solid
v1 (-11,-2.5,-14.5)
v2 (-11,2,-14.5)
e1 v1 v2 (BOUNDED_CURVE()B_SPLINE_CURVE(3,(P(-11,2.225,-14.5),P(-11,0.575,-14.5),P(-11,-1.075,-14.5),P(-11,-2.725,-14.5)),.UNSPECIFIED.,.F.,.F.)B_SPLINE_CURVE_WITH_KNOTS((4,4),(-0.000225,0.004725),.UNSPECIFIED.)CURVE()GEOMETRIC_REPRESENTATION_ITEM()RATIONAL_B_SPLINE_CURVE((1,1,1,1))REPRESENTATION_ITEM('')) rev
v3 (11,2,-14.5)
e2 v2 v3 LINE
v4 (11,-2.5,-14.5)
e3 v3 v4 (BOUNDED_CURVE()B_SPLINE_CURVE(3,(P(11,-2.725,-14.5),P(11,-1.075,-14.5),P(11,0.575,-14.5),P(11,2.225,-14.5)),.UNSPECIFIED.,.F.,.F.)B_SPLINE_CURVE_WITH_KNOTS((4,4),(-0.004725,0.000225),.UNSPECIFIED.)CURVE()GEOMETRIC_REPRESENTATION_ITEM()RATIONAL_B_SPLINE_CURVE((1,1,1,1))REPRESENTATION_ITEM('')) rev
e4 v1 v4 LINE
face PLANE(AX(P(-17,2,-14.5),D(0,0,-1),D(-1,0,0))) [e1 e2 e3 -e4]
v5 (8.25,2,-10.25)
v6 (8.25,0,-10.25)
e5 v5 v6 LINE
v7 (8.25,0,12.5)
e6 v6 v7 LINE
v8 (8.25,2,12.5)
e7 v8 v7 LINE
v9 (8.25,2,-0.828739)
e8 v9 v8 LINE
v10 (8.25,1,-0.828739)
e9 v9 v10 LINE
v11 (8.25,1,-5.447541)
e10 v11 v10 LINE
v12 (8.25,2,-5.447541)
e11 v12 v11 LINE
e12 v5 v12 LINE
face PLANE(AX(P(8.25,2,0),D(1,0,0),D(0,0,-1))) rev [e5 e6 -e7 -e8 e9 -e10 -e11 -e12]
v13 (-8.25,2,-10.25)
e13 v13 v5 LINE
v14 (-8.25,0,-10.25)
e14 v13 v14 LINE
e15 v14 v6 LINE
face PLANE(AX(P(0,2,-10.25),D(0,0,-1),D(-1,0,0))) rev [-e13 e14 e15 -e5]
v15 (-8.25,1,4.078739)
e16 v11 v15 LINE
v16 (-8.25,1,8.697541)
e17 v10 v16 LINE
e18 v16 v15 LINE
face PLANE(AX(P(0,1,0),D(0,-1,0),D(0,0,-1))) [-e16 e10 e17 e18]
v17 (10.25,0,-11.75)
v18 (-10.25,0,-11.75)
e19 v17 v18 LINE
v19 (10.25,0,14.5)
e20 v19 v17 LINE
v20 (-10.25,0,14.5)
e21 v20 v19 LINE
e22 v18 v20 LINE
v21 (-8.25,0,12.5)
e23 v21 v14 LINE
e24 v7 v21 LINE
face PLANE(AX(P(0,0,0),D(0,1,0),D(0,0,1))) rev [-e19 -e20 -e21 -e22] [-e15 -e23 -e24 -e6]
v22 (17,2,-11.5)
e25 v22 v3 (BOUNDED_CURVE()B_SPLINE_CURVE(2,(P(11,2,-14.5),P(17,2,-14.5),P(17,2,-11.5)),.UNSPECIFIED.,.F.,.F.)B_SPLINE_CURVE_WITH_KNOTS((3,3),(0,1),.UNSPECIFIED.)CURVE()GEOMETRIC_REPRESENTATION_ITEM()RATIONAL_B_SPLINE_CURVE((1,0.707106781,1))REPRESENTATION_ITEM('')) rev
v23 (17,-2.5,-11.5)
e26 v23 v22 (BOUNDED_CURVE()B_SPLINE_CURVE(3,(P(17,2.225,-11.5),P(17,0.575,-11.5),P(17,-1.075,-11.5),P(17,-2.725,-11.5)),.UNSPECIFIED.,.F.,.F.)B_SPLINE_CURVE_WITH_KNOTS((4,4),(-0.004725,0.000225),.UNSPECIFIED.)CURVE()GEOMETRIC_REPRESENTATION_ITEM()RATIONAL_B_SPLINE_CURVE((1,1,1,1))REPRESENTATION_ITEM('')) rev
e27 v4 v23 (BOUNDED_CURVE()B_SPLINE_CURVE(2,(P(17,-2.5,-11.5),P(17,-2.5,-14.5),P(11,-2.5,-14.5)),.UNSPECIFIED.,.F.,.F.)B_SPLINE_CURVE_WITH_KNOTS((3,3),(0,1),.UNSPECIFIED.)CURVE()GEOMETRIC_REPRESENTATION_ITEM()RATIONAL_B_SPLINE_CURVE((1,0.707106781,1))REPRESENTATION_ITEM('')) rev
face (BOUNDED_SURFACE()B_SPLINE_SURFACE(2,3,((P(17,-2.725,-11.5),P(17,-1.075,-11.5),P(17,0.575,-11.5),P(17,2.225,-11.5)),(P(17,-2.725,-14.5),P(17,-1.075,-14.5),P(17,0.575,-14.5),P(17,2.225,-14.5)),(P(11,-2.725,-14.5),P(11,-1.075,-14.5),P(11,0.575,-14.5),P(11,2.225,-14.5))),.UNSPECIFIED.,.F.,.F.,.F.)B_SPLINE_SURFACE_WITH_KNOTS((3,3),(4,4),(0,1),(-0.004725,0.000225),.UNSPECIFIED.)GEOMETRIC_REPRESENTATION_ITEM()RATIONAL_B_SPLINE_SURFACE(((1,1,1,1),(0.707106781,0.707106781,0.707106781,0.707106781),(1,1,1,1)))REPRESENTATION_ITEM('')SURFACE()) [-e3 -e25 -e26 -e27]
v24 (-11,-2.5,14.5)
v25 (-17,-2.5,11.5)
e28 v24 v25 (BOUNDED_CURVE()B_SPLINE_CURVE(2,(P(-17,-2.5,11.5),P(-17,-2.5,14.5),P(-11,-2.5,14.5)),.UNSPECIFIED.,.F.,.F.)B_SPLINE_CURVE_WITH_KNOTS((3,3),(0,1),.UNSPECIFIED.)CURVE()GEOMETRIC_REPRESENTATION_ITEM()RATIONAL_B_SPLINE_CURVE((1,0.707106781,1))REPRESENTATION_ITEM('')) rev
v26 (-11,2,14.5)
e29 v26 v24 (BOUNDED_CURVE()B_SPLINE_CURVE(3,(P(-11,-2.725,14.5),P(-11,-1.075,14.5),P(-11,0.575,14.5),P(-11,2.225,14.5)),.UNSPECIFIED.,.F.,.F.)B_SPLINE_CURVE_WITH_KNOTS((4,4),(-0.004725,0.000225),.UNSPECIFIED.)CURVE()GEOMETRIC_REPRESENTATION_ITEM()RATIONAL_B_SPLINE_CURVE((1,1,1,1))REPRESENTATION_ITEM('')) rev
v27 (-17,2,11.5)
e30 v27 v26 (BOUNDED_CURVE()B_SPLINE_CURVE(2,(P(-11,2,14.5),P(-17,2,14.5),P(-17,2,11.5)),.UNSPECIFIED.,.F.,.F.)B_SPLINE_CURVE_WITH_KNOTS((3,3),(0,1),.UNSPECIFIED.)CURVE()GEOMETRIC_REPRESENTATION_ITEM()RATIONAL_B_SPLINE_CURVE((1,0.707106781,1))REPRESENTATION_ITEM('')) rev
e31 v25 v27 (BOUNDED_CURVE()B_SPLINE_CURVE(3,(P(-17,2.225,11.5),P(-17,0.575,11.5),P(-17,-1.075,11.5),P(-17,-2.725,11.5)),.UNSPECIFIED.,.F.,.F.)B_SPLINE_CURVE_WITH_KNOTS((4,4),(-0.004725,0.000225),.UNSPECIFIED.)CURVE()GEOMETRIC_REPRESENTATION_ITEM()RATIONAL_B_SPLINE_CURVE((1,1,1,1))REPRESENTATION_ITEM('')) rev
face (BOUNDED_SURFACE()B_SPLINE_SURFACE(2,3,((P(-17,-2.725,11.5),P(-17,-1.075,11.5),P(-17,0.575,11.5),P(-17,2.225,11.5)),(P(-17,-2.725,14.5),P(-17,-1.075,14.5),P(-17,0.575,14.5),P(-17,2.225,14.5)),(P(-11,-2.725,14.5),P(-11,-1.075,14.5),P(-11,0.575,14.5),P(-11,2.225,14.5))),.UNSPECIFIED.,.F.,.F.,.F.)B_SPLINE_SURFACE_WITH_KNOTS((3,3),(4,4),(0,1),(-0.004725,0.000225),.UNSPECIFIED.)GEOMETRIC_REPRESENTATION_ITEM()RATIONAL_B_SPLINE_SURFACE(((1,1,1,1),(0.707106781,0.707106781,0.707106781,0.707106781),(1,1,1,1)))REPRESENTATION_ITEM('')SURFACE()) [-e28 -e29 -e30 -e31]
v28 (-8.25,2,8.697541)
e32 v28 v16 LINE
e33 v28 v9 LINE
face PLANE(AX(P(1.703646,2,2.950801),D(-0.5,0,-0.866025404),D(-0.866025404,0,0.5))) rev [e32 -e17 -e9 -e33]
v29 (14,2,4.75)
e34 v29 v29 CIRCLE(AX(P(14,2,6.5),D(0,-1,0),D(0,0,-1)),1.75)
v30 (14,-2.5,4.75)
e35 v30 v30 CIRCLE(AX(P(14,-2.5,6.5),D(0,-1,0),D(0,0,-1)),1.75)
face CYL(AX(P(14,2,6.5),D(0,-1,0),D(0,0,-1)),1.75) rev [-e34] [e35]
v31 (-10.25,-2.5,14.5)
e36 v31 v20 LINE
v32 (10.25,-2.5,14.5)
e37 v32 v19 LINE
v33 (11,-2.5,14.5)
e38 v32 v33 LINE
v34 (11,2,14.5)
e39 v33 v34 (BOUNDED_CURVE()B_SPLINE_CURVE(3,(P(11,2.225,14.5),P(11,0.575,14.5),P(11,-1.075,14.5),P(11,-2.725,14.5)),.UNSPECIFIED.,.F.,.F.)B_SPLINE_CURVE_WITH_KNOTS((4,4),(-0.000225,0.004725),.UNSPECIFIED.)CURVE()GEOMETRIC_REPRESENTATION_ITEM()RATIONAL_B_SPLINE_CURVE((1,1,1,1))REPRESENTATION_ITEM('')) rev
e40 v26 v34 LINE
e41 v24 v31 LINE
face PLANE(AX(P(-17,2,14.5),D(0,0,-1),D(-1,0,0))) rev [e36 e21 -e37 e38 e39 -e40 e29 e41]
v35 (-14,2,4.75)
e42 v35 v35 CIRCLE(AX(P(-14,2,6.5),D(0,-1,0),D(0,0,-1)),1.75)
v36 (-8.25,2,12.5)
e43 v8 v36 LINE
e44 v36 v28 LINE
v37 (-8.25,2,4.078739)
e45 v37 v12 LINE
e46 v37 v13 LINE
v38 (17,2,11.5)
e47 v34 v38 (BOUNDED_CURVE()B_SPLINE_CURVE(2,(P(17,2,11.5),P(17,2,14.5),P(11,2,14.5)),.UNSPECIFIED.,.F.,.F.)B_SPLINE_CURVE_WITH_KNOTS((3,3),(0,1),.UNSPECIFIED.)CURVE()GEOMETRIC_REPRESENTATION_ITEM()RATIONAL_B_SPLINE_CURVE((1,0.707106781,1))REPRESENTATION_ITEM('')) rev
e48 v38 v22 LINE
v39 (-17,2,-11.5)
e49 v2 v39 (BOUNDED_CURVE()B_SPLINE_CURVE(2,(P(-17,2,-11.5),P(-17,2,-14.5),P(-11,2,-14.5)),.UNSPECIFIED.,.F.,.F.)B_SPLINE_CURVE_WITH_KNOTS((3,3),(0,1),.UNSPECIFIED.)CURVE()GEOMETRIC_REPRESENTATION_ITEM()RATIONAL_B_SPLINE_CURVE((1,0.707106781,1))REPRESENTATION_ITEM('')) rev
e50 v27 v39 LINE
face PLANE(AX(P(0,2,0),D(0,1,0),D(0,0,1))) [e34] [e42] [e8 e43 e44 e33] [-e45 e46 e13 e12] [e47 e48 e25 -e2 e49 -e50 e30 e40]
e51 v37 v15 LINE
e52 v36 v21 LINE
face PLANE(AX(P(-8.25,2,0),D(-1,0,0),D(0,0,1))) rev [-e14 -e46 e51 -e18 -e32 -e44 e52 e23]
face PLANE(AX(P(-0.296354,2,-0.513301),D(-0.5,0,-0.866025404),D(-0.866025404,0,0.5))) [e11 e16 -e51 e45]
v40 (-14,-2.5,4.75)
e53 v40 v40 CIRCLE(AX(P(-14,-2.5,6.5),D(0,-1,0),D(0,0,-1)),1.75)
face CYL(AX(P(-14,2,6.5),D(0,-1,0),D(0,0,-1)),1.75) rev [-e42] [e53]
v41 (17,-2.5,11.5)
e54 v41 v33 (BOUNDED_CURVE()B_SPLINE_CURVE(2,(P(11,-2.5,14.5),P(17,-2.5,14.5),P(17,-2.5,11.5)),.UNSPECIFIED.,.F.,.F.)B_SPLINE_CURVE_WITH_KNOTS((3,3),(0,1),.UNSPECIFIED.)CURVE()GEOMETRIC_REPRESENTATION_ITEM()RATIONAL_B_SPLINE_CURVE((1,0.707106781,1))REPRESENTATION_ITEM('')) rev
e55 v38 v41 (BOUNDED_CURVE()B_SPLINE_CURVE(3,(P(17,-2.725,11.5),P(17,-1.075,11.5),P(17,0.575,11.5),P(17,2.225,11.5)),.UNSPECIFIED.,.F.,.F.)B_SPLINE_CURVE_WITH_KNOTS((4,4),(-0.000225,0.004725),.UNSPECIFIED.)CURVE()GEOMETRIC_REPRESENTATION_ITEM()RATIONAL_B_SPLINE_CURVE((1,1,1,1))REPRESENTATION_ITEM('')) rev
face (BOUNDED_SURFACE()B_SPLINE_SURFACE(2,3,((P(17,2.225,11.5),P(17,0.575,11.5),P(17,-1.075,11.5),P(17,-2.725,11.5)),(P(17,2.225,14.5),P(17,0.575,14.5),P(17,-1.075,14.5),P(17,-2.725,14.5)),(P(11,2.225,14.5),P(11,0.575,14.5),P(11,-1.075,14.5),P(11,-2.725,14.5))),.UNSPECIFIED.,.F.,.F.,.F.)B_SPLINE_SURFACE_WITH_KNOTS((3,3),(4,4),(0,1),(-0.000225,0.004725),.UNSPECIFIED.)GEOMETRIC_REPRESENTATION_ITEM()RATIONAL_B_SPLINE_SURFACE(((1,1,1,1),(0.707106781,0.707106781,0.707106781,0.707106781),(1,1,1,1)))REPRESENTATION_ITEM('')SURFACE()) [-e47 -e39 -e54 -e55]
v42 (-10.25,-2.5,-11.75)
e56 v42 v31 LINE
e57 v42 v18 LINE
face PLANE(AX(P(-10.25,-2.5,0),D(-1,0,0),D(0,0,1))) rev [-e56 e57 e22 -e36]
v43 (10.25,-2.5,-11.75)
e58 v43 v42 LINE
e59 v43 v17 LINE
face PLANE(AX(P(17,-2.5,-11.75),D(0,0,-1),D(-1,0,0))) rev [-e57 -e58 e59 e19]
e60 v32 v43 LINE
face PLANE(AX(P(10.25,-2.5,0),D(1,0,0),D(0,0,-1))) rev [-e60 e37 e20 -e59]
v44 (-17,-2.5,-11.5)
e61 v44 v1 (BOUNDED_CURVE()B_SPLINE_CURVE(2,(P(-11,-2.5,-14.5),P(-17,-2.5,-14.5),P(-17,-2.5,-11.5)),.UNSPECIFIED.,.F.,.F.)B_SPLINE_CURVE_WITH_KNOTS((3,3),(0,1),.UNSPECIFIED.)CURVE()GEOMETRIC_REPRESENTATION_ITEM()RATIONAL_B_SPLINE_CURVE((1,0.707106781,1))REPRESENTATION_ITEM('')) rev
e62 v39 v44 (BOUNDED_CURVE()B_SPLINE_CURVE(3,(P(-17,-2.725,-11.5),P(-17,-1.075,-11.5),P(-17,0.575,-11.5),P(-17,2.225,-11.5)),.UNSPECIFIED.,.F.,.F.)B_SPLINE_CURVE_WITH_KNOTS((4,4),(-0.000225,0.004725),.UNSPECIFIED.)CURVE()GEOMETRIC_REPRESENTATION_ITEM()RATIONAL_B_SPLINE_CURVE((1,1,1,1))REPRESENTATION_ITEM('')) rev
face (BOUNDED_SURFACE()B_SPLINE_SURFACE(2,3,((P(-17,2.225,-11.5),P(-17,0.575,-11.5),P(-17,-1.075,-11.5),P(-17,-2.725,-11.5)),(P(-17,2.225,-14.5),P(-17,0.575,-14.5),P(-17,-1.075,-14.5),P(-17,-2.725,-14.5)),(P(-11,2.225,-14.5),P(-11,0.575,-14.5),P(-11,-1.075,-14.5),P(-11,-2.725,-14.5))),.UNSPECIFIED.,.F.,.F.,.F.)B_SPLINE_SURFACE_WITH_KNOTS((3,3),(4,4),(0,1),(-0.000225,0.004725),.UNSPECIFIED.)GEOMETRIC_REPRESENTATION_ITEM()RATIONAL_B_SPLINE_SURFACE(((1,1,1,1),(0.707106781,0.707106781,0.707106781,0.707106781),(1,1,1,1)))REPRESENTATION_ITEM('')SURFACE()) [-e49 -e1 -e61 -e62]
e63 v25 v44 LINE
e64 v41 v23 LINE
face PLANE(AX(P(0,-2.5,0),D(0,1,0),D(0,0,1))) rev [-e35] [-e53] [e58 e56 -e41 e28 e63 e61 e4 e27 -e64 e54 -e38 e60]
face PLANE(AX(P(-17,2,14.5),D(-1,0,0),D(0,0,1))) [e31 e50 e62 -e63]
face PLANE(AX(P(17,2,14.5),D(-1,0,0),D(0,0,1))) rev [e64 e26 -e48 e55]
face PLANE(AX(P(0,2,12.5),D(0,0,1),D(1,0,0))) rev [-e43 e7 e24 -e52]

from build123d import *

# Parameters (mm, degrees)
SKETCH1_W           = 34
SKETCH1_H           = 29
BOSS_EXTRUDE1_DEPTH = 2
SKETCH1_4_W         = 6.75
SKETCH1_4_H         = 26.25
BOSS_EXTRUDE2_DEPTH = 2.5
SKETCH2_W           = 34
SKETCH2_H           = 2.75
BOSS_EXTRUDE7_DEPTH = 2.5
CUT_EXTRUDE1_DEPTH  = 23.483327156
SKETCH4_R           = 1.75
CUT_EXTRUDE2_DEPTH  = 23.79254264
SKETCH5_W           = 16.5
SKETCH5_H           = 22.75
CUT_EXTRUDE3_DEPTH  = 1
FILLET1_SIZE        = 6
FILLET1_SIZE_2      = 3


with BuildPart() as part:
    # Sketch1 → Boss-Extrude1 (new body)
    with BuildSketch(Plane(origin=(0, 0, 0), x_dir=(1, 0, 0), z_dir=(0, 1, 0))):
        Rectangle(SKETCH1_W, SKETCH1_H)
    extrude(amount=BOSS_EXTRUDE1_DEPTH)

    # Sketch1<4> → Boss-Extrude2 (add)
    with BuildSketch(Plane(origin=(0, 0, 0), x_dir=(1, 0, 0), z_dir=(0, 1, 0))):
        with Locations((-13.625, -1.375)):
            Rectangle(SKETCH1_4_W, SKETCH1_4_H)
        with Locations((13.625, -1.375)):
            Rectangle(SKETCH1_4_W, SKETCH1_4_H)
    extrude(amount=-BOSS_EXTRUDE2_DEPTH)

    # Sketch2 → Boss-Extrude7 (add)
    with BuildSketch(Plane.XZ):
        with Locations((0, -13.125)):
            Rectangle(SKETCH2_W, SKETCH2_H)
    extrude(amount=BOSS_EXTRUDE7_DEPTH)

    # Sketch3 → Cut-Extrude1 (cut, through all)
    with BuildSketch(Plane.XZ):
        Polygon((-8.25, 12.5), (-8.25, 8.697540798), (8.25, -0.828738644), (8.25, 12.5), align=None)
        Polygon((-8.25, 4.078738644), (-8.25, -10.25), (8.25, -10.25), (8.25, -5.447540798), align=None)
    extrude(amount=-CUT_EXTRUDE1_DEPTH, mode=Mode.SUBTRACT)

    # Sketch4 → Cut-Extrude2 (cut, through all)
    with BuildSketch(Plane.XZ.offset(2.5)):
        with Locations(Location((14, 6.5, 0), (0, 0, 270))):
            Circle(SKETCH4_R)
        with Locations(Location((-14, 6.5, 0), (0, 0, 270))):
            Circle(SKETCH4_R)
    extrude(amount=-CUT_EXTRUDE2_DEPTH, mode=Mode.SUBTRACT)

    # Sketch5 → Cut-Extrude3 (cut)
    with BuildSketch(Plane.XZ):
        with Locations((0, 1.125)):
            Rectangle(SKETCH5_W, SKETCH5_H)
    extrude(amount=-CUT_EXTRUDE3_DEPTH, mode=Mode.SUBTRACT)

    # Fillet1
    # an asymmetric fillet: 6, 3 mm, written as the material it takes off along each edge
    with BuildSketch(Plane(origin=(-17, 17, 14.5), x_dir=(1, 0, 0), z_dir=(0, -1, 0)), Plane(origin=(17, -17.5, 14.5), x_dir=(-1, 0, 0), z_dir=(0, 1, 0))) as fillet1_piece_1:
        with BuildLine():
            Bezier((FILLET1_SIZE, 0), (0, 0), (0, -FILLET1_SIZE_2), weights=[1, 0.707106781, 1])
            Line((0, -FILLET1_SIZE_2), (0, 0))
            Line((0, 0), (FILLET1_SIZE, 0))
        make_face()
    extrude(amount=34.5, mode=Mode.SUBTRACT)
    with BuildSketch(Plane(origin=(-17, 17, -14.5), x_dir=(1, 0, 0), z_dir=(0, -1, 0)), Plane(origin=(17, -17.5, -14.5), x_dir=(-1, 0, 0), z_dir=(0, 1, 0))) as fillet1_piece_2:
        with BuildLine():
            Bezier((FILLET1_SIZE, 0), (0, 0), (0, FILLET1_SIZE_2), weights=[1, 0.707106781, 1])
            Line((0, FILLET1_SIZE_2), (0, 0))
            Line((0, 0), (FILLET1_SIZE, 0))
        make_face()
    extrude(amount=34.5, mode=Mode.SUBTRACT)


solid = part.part
